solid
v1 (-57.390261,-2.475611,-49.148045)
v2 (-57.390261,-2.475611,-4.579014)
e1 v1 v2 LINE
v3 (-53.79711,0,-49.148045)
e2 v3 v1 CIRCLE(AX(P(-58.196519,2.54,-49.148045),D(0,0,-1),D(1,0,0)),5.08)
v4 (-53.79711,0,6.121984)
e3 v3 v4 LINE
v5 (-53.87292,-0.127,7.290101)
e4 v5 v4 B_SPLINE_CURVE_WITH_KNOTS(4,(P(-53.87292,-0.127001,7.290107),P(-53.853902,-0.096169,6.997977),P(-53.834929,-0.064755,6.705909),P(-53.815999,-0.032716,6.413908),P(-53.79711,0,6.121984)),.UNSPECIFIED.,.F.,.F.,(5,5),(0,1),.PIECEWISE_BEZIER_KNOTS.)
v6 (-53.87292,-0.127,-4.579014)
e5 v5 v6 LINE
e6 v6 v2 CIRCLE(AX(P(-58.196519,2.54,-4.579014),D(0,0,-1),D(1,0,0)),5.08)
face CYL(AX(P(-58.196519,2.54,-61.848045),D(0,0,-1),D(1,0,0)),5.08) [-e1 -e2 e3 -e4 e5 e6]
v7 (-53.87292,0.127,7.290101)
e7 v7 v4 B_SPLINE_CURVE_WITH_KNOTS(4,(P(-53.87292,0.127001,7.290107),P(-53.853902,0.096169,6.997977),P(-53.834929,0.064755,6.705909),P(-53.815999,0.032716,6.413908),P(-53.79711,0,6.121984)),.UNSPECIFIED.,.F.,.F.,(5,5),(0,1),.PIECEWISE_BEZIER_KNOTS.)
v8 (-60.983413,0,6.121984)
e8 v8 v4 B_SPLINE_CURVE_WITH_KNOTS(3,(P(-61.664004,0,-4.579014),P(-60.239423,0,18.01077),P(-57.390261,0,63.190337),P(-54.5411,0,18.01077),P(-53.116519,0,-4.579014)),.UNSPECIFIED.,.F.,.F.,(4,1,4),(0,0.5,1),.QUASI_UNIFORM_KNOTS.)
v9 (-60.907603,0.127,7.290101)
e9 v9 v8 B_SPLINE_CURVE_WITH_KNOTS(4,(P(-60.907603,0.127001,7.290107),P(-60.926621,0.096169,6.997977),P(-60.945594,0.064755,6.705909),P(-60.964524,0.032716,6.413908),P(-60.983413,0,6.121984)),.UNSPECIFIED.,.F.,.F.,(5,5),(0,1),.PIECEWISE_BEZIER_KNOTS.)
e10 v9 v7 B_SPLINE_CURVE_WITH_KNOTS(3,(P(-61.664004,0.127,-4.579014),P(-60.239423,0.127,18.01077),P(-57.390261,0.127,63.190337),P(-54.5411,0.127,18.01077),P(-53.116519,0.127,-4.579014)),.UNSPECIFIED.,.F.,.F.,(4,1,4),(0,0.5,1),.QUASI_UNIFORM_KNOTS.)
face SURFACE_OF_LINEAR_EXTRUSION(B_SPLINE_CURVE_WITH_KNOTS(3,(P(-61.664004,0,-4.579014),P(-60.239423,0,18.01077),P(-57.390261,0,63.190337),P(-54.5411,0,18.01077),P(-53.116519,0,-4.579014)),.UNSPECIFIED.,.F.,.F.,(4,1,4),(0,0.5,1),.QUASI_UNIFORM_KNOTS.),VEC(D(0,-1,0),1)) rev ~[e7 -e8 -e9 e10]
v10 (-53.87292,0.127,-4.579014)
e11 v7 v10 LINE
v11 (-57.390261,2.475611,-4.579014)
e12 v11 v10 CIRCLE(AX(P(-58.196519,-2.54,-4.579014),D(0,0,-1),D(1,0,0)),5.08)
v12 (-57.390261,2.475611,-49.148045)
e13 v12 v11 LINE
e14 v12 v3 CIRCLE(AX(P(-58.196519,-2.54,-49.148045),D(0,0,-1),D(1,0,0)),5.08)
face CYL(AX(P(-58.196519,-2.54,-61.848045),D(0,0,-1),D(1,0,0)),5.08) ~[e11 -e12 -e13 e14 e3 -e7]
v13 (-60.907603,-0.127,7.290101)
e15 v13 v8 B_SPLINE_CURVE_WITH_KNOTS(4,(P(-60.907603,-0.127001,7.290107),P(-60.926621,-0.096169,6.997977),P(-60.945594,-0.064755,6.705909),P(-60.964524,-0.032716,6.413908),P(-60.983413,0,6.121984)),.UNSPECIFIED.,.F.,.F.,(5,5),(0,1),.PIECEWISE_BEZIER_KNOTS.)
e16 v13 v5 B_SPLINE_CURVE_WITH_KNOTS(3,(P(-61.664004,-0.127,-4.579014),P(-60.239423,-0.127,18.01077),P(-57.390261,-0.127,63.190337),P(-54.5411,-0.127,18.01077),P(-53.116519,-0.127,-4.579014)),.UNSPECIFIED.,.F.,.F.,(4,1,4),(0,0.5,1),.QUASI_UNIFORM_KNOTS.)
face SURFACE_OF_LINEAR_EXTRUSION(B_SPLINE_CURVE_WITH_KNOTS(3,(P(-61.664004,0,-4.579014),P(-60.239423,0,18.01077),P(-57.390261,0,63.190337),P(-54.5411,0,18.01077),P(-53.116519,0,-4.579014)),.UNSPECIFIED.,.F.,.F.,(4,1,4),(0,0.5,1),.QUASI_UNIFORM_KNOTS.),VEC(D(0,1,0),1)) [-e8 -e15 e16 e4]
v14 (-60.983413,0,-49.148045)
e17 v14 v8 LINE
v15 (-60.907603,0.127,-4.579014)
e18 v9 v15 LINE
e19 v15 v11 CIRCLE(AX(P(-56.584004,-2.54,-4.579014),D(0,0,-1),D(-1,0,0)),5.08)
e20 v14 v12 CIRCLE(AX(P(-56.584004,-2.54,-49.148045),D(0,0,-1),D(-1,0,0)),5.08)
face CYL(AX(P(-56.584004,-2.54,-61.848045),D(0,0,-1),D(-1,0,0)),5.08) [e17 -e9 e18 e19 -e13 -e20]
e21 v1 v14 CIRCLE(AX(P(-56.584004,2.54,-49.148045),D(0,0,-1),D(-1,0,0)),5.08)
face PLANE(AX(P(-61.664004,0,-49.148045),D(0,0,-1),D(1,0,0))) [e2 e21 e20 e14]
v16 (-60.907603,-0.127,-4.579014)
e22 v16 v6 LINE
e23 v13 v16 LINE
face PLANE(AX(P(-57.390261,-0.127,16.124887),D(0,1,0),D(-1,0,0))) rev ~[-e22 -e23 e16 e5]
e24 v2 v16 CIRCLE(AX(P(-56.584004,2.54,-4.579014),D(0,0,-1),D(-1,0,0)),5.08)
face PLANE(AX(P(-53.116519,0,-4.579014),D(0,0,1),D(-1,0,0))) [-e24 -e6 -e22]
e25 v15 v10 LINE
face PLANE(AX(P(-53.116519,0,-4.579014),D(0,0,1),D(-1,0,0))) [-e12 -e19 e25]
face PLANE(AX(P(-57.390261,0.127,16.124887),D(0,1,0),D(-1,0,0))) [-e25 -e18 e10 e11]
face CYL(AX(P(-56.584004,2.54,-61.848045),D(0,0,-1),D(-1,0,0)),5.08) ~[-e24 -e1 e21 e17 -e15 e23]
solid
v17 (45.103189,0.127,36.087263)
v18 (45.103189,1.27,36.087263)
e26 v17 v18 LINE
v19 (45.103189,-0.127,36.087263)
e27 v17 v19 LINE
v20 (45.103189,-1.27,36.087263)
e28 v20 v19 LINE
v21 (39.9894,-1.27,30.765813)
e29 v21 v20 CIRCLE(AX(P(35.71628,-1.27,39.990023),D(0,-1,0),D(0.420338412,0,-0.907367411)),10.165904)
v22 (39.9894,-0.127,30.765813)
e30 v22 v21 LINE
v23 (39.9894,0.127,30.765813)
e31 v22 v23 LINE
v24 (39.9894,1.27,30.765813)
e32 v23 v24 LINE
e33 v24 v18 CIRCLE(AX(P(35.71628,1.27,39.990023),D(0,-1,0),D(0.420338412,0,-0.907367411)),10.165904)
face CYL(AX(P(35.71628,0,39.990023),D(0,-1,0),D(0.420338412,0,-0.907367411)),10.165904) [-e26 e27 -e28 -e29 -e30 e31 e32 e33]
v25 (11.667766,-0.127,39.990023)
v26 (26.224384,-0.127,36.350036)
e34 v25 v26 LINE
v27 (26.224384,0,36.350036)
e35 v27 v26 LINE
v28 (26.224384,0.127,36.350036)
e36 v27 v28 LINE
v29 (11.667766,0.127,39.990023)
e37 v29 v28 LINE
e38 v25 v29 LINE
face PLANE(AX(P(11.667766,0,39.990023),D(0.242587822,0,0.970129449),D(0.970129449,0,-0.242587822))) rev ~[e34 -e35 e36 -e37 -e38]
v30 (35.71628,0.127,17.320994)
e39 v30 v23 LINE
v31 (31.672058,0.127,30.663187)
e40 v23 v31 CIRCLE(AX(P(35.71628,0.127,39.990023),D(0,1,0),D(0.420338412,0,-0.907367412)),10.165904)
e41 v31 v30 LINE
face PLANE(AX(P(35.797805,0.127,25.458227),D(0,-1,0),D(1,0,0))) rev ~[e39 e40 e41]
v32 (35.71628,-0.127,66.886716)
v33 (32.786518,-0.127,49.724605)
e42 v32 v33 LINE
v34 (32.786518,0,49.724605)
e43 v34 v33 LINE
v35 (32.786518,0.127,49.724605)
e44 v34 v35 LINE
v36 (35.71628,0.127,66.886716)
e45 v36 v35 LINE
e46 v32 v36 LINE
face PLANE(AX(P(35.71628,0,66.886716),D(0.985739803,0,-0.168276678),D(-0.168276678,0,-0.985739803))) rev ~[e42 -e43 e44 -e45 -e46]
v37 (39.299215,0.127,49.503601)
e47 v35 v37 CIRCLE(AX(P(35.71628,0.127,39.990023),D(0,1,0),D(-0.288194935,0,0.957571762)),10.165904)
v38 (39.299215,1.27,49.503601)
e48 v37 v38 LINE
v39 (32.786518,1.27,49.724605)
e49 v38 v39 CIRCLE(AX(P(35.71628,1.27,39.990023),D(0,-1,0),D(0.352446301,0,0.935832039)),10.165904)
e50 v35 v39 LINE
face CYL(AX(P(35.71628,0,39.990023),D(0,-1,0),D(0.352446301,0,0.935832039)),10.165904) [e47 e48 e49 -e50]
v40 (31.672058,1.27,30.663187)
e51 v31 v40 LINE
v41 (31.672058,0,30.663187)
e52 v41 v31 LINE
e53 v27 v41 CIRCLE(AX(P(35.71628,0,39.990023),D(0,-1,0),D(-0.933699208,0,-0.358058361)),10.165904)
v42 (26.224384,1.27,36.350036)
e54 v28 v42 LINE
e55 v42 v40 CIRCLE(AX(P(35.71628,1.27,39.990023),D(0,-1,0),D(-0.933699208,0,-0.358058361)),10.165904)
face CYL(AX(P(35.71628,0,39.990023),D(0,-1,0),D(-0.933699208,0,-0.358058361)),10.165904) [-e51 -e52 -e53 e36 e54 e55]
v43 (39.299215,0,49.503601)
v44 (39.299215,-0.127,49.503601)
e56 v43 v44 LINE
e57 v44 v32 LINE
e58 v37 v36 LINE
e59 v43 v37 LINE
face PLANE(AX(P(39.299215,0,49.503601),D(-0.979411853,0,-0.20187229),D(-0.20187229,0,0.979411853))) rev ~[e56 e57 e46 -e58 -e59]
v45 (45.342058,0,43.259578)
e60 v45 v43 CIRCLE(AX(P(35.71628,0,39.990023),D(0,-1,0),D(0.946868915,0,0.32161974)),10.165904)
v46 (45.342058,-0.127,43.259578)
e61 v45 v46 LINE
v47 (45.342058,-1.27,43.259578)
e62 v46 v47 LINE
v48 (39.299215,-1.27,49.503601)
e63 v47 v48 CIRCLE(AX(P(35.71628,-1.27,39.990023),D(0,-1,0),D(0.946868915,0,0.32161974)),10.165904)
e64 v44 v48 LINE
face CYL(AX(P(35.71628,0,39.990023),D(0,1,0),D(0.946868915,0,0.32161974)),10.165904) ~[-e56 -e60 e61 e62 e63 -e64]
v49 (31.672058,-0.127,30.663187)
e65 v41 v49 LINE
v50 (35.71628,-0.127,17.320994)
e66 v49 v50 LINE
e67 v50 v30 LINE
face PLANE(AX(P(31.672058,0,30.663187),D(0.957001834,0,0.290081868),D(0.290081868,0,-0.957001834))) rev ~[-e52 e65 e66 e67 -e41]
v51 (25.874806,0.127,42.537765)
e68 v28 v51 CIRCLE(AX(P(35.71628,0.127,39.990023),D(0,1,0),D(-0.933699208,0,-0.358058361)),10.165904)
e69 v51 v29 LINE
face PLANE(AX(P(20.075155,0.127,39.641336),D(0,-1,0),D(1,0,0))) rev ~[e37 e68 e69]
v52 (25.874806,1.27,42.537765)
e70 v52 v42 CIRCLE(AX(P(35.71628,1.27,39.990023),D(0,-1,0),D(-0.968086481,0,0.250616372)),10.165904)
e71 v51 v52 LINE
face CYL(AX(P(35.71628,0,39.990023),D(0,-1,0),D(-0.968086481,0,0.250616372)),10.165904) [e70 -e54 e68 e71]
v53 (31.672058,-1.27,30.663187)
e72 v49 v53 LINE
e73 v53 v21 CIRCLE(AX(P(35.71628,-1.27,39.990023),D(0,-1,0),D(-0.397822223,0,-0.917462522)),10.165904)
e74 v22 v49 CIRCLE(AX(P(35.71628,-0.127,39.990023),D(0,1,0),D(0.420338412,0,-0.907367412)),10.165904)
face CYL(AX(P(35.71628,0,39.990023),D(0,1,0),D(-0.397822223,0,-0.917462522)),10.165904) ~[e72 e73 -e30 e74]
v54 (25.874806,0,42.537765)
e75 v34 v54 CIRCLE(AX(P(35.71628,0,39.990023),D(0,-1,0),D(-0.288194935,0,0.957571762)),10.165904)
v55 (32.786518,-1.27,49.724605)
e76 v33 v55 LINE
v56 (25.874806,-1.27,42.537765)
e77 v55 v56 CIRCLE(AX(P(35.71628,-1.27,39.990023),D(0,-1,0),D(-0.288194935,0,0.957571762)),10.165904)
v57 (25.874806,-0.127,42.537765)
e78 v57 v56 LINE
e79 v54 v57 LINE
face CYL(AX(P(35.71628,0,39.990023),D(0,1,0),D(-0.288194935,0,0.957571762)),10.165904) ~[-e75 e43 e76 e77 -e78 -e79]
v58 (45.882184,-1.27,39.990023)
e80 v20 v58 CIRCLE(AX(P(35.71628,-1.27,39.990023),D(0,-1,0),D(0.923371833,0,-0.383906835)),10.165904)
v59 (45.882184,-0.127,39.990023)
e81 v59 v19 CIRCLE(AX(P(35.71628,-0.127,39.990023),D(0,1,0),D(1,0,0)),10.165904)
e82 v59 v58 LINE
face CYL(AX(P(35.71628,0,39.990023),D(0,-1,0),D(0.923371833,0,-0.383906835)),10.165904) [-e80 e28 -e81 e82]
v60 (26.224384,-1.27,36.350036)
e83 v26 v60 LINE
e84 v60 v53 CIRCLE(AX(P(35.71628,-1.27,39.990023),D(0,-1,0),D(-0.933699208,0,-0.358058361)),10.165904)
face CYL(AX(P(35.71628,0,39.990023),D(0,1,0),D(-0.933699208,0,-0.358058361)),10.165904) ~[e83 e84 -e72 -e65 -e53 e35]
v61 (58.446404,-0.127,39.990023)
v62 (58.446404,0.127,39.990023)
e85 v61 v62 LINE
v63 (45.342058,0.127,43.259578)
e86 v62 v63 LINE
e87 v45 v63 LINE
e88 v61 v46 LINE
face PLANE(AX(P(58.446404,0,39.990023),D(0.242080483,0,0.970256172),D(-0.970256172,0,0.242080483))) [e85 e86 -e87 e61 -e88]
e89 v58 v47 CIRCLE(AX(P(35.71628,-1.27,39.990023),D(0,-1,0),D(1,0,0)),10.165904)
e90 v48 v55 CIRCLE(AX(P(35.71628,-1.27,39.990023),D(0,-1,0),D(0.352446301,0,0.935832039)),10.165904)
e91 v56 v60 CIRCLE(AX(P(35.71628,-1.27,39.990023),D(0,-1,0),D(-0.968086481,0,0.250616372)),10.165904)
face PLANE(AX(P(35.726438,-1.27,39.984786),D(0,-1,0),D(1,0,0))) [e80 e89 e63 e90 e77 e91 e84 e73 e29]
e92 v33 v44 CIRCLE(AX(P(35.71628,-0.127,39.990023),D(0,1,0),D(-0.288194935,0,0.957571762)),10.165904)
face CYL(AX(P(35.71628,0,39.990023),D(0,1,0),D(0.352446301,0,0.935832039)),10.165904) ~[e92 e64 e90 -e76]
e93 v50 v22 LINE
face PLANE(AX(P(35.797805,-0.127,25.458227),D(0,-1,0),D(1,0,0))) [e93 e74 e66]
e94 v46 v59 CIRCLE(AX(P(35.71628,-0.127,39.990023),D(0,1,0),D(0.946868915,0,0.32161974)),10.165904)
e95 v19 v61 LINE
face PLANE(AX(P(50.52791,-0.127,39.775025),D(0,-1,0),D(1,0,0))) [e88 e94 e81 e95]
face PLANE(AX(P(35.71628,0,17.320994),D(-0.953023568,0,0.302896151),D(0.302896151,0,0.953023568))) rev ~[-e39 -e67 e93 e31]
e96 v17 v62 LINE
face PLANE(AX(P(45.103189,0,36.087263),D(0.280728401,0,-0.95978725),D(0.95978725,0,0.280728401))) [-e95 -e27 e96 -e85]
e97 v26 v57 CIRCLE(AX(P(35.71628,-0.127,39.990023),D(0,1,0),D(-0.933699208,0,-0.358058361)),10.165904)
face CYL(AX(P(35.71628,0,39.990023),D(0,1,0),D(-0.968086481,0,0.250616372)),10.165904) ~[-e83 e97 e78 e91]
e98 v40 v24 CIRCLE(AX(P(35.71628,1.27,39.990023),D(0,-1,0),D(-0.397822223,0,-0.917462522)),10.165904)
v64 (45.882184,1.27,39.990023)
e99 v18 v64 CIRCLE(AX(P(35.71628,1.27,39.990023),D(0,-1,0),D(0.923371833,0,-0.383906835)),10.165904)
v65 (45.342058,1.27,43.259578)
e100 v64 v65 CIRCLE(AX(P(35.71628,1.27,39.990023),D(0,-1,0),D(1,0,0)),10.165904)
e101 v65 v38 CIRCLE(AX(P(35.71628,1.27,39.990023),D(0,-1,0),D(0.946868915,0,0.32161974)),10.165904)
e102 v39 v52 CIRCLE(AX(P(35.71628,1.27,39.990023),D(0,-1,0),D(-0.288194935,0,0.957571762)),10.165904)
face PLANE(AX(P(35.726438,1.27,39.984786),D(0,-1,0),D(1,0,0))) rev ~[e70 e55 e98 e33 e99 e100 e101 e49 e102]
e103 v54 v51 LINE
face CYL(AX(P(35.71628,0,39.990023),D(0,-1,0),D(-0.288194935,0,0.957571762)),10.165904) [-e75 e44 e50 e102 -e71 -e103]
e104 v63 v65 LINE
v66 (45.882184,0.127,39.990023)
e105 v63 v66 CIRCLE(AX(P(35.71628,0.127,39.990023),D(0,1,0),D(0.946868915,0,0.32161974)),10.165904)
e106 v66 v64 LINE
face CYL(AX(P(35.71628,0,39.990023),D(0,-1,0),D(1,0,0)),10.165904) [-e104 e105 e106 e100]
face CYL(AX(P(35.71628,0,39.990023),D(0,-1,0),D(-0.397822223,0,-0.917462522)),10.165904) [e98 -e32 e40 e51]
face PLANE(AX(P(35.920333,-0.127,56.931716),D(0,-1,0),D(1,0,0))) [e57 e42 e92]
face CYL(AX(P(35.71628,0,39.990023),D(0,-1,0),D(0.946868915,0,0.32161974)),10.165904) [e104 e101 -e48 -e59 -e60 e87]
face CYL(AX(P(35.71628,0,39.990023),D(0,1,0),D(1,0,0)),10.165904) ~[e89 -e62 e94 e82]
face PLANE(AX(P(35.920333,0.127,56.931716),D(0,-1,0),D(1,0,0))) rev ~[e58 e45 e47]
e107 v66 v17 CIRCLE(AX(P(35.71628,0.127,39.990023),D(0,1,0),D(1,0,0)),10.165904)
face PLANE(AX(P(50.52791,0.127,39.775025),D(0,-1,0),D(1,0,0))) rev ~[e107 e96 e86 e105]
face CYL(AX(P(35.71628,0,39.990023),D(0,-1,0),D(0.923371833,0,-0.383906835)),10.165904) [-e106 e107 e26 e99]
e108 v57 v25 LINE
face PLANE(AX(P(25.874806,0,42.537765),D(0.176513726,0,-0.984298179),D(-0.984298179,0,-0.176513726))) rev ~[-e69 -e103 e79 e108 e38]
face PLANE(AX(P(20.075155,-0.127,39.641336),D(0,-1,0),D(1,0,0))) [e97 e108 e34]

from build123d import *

# Parameters (mm, degrees)
F1_DEPTH    = 0.127
F2_DEPTH    = 2.54
F3_T1_DEPTH = 69.9690318011
F5_DEPTH    = 1.27
F6_DEPTH    = 0.127


# Not quite as in the source:
# - a fillet or chamfer that OpenCascade refuses, or shapes differently, is made with other operations: its cross-section is extruded or revolved along the edge and cut away or added


with BuildPart() as f1:
    # F0 (on Front) → F1 (new body, symmetric)
    with BuildSketch(Plane.XZ):
        with BuildLine():
            add(Edge.make_bspline(
                [(-61.6640038788, -4.5790136792), (-60.2394230664, 18.0107697379), (-57.3902614415, 63.190336572), (-54.5410998166, 18.0107697379), (-53.1165190041, -4.5790136792)],
                knots=[0, 0, 0, 0, 0.5, 1, 1, 1, 1], degree=3))
            Line((-61.6640038788, -4.5790136792), (-53.1165190041, -4.5790136792))
        make_face()
    extrude(amount=F1_DEPTH, both=True)

    # F0 (on Front) → F2 (join, symmetric)
    with BuildSketch(Plane.XZ):
        Polygon((-61.6640038788, -4.5790136792), (-53.1165190041, -8.8321231306), (-53.1165190041, -4.5790136792), align=None)
        Polygon((-61.6640038788, -4.5790136792), (-61.6640038788, -12.8659997135), (-53.1165190041, -8.8321231306), align=None)
        Polygon((-61.6640038788, -12.8659997135), (-53.1165190041, -15.6753063202), (-53.1165190041, -8.8321231306), align=None)
        Polygon((-61.6640038788, -12.8659997135), (-61.6640038788, -19.7091810405), (-53.1165190041, -15.6753063202), align=None)
        Polygon((-61.6640038788, -19.7091810405), (-53.1165190041, -23.5269572586), (-53.1165190041, -15.6753063202), align=None)
        Polygon((-61.6640038788, -19.7091810405), (-61.6640038788, -27.4887997657), (-53.1165190041, -23.5269572586), align=None)
        Polygon((-61.6640038788, -27.4887997657), (-53.1165190041, -31.4506441355), (-53.1165190041, -23.5269572586), align=None)
        Polygon((-61.6640038788, -27.4887997657), (-61.6640038788, -37.051204592), (-53.1165190041, -31.4506441355), align=None)
        Polygon((-61.6640038788, -37.051204592), (-53.1165190041, -41.0130489618), (-53.1165190041, -31.4506441355), align=None)
        Polygon((-61.6640038788, -37.051204592), (-61.6640038788, -44.6657761931), (-53.1165190041, -41.0130489618), align=None)
        Polygon((-61.6640038788, -44.6657761931), (-53.1165190041, -49.1480454803), (-53.1165190041, -41.0130489618), align=None)
        Polygon((-61.6640038788, -44.6657761931), (-61.6640038788, -49.1480454803), (-53.1165190041, -49.1480454803), align=None)
    extrude(amount=F2_DEPTH, both=True)

    # F3: fillet of radius 5.08 on 4 edges, made by hand

    # F3_s2 → F3_t1 (cut)
    with BuildSketch(Plane.XY.offset(-61.8480454803)):
        with BuildLine():
            ThreePointArc((-61.6640038788, -2.54), (-60.1761063273, 1.0521024484), (-56.5840038788, 2.54))
            Line((-56.5840038788, 2.54), (-61.6640038788, 2.54))
            Line((-61.6640038788, 2.54), (-61.6640038788, -2.54))
        make_face()
        with BuildLine():
            ThreePointArc((-61.6640038788, 2.54), (-60.1761063273, -1.0521024484), (-56.5840038788, -2.54))
            Line((-56.5840038788, -2.54), (-61.6640038788, -2.54))
            Line((-61.6640038788, -2.54), (-61.6640038788, 2.54))
        make_face()
        with BuildLine():
            ThreePointArc((-53.1165190041, 2.54), (-54.6044165557, -1.0521024484), (-58.1965190041, -2.54))
            Line((-58.1965190041, -2.54), (-53.1165190041, -2.54))
            Line((-53.1165190041, -2.54), (-53.1165190041, 2.54))
        make_face()
        with BuildLine():
            ThreePointArc((-53.1165190041, -2.54), (-54.6044165557, 1.0521024484), (-58.1965190041, 2.54))
            Line((-58.1965190041, 2.54), (-53.1165190041, 2.54))
            Line((-53.1165190041, 2.54), (-53.1165190041, -2.54))
        make_face()
    extrude(amount=F3_T1_DEPTH, mode=Mode.SUBTRACT)


with BuildPart() as f5:
    # F4 (on Front) → F5 (new body, symmetric)
    with BuildSketch(Plane.XZ):
        with BuildLine():
            ThreePointArc((45.1031894134, 36.0872628929), (45.6855333143, 38.000150468), (45.8821839732, 39.9900227785))
            ThreePointArc((45.8821839732, 39.9900227785), (45.7462436924, 41.6469572454), (45.3420584857, 43.2595780645))
            ThreePointArc((45.3420584857, 43.2595780645), (43.0213801023, 47.0597550319), (39.2992154724, 49.5036011011))
            ThreePointArc((39.2992154724, 49.5036011011), (36.0610548886, 50.1500782492), (32.7865184008, 49.7246050309))
            ThreePointArc((32.7865184008, 49.7246050309), (28.3890172345, 47.0367817513), (25.8748064715, 42.5377646665))
            ThreePointArc((25.8748064715, 42.5377646665), (25.566561341, 39.416611169), (26.2243841751, 36.3500359891))
            ThreePointArc((26.2243841751, 36.3500359891), (28.3751844661, 32.9576755169), (31.672057957, 30.6631871971))
            ThreePointArc((31.672057957, 30.6631871971), (35.8417057181, 29.8248929156), (39.9894001299, 30.7658131144))
            ThreePointArc((39.9894001299, 30.7658131144), (43.0462567434, 32.9460861946), (45.1031894134, 36.0872628929))
        make_face()
    extrude(amount=F5_DEPTH, both=True)

    # F4 (on Front) → F6 (join, symmetric)
    with BuildSketch(Plane.XZ):
        with BuildLine():
            ThreePointArc((26.2243841751, 36.3500359891), (25.566561341, 39.416611169), (25.8748064715, 42.5377646665))
            Line((25.8748064715, 42.5377646665), (11.667765677, 39.9900227785))
            Line((11.667765677, 39.9900227785), (26.2243841751, 36.3500359891))
        make_face()
        with BuildLine():
            ThreePointArc((32.7865184008, 49.7246050309), (36.0610548886, 50.1500782492), (39.2992154724, 49.5036011011))
            Line((39.2992154724, 49.5036011011), (35.7162803411, 66.886715591))
            Line((35.7162803411, 66.886715591), (32.7865184008, 49.7246050309))
        make_face()
        with BuildLine():
            Line((35.7162803411, 17.3209942877), (39.9894001299, 30.7658131144))
            ThreePointArc((39.9894001299, 30.7658131144), (35.8417057181, 29.8248929156), (31.672057957, 30.6631871971))
            Line((31.672057957, 30.6631871971), (35.7162803411, 17.3209942877))
        make_face()
        with BuildLine():
            ThreePointArc((45.3420584857, 43.2595780645), (45.7462436924, 41.6469572454), (45.8821839732, 39.9900227785))
            ThreePointArc((45.8821839732, 39.9900227785), (45.6855333143, 38.000150468), (45.1031894134, 36.0872628929))
            Line((45.1031894134, 36.0872628929), (58.4464035928, 39.9900227785))
            Line((58.4464035928, 39.9900227785), (45.3420584857, 43.2595780645))
        make_face()
    extrude(amount=F6_DEPTH, both=True)


solid = Compound([f1.part, f5.part])
